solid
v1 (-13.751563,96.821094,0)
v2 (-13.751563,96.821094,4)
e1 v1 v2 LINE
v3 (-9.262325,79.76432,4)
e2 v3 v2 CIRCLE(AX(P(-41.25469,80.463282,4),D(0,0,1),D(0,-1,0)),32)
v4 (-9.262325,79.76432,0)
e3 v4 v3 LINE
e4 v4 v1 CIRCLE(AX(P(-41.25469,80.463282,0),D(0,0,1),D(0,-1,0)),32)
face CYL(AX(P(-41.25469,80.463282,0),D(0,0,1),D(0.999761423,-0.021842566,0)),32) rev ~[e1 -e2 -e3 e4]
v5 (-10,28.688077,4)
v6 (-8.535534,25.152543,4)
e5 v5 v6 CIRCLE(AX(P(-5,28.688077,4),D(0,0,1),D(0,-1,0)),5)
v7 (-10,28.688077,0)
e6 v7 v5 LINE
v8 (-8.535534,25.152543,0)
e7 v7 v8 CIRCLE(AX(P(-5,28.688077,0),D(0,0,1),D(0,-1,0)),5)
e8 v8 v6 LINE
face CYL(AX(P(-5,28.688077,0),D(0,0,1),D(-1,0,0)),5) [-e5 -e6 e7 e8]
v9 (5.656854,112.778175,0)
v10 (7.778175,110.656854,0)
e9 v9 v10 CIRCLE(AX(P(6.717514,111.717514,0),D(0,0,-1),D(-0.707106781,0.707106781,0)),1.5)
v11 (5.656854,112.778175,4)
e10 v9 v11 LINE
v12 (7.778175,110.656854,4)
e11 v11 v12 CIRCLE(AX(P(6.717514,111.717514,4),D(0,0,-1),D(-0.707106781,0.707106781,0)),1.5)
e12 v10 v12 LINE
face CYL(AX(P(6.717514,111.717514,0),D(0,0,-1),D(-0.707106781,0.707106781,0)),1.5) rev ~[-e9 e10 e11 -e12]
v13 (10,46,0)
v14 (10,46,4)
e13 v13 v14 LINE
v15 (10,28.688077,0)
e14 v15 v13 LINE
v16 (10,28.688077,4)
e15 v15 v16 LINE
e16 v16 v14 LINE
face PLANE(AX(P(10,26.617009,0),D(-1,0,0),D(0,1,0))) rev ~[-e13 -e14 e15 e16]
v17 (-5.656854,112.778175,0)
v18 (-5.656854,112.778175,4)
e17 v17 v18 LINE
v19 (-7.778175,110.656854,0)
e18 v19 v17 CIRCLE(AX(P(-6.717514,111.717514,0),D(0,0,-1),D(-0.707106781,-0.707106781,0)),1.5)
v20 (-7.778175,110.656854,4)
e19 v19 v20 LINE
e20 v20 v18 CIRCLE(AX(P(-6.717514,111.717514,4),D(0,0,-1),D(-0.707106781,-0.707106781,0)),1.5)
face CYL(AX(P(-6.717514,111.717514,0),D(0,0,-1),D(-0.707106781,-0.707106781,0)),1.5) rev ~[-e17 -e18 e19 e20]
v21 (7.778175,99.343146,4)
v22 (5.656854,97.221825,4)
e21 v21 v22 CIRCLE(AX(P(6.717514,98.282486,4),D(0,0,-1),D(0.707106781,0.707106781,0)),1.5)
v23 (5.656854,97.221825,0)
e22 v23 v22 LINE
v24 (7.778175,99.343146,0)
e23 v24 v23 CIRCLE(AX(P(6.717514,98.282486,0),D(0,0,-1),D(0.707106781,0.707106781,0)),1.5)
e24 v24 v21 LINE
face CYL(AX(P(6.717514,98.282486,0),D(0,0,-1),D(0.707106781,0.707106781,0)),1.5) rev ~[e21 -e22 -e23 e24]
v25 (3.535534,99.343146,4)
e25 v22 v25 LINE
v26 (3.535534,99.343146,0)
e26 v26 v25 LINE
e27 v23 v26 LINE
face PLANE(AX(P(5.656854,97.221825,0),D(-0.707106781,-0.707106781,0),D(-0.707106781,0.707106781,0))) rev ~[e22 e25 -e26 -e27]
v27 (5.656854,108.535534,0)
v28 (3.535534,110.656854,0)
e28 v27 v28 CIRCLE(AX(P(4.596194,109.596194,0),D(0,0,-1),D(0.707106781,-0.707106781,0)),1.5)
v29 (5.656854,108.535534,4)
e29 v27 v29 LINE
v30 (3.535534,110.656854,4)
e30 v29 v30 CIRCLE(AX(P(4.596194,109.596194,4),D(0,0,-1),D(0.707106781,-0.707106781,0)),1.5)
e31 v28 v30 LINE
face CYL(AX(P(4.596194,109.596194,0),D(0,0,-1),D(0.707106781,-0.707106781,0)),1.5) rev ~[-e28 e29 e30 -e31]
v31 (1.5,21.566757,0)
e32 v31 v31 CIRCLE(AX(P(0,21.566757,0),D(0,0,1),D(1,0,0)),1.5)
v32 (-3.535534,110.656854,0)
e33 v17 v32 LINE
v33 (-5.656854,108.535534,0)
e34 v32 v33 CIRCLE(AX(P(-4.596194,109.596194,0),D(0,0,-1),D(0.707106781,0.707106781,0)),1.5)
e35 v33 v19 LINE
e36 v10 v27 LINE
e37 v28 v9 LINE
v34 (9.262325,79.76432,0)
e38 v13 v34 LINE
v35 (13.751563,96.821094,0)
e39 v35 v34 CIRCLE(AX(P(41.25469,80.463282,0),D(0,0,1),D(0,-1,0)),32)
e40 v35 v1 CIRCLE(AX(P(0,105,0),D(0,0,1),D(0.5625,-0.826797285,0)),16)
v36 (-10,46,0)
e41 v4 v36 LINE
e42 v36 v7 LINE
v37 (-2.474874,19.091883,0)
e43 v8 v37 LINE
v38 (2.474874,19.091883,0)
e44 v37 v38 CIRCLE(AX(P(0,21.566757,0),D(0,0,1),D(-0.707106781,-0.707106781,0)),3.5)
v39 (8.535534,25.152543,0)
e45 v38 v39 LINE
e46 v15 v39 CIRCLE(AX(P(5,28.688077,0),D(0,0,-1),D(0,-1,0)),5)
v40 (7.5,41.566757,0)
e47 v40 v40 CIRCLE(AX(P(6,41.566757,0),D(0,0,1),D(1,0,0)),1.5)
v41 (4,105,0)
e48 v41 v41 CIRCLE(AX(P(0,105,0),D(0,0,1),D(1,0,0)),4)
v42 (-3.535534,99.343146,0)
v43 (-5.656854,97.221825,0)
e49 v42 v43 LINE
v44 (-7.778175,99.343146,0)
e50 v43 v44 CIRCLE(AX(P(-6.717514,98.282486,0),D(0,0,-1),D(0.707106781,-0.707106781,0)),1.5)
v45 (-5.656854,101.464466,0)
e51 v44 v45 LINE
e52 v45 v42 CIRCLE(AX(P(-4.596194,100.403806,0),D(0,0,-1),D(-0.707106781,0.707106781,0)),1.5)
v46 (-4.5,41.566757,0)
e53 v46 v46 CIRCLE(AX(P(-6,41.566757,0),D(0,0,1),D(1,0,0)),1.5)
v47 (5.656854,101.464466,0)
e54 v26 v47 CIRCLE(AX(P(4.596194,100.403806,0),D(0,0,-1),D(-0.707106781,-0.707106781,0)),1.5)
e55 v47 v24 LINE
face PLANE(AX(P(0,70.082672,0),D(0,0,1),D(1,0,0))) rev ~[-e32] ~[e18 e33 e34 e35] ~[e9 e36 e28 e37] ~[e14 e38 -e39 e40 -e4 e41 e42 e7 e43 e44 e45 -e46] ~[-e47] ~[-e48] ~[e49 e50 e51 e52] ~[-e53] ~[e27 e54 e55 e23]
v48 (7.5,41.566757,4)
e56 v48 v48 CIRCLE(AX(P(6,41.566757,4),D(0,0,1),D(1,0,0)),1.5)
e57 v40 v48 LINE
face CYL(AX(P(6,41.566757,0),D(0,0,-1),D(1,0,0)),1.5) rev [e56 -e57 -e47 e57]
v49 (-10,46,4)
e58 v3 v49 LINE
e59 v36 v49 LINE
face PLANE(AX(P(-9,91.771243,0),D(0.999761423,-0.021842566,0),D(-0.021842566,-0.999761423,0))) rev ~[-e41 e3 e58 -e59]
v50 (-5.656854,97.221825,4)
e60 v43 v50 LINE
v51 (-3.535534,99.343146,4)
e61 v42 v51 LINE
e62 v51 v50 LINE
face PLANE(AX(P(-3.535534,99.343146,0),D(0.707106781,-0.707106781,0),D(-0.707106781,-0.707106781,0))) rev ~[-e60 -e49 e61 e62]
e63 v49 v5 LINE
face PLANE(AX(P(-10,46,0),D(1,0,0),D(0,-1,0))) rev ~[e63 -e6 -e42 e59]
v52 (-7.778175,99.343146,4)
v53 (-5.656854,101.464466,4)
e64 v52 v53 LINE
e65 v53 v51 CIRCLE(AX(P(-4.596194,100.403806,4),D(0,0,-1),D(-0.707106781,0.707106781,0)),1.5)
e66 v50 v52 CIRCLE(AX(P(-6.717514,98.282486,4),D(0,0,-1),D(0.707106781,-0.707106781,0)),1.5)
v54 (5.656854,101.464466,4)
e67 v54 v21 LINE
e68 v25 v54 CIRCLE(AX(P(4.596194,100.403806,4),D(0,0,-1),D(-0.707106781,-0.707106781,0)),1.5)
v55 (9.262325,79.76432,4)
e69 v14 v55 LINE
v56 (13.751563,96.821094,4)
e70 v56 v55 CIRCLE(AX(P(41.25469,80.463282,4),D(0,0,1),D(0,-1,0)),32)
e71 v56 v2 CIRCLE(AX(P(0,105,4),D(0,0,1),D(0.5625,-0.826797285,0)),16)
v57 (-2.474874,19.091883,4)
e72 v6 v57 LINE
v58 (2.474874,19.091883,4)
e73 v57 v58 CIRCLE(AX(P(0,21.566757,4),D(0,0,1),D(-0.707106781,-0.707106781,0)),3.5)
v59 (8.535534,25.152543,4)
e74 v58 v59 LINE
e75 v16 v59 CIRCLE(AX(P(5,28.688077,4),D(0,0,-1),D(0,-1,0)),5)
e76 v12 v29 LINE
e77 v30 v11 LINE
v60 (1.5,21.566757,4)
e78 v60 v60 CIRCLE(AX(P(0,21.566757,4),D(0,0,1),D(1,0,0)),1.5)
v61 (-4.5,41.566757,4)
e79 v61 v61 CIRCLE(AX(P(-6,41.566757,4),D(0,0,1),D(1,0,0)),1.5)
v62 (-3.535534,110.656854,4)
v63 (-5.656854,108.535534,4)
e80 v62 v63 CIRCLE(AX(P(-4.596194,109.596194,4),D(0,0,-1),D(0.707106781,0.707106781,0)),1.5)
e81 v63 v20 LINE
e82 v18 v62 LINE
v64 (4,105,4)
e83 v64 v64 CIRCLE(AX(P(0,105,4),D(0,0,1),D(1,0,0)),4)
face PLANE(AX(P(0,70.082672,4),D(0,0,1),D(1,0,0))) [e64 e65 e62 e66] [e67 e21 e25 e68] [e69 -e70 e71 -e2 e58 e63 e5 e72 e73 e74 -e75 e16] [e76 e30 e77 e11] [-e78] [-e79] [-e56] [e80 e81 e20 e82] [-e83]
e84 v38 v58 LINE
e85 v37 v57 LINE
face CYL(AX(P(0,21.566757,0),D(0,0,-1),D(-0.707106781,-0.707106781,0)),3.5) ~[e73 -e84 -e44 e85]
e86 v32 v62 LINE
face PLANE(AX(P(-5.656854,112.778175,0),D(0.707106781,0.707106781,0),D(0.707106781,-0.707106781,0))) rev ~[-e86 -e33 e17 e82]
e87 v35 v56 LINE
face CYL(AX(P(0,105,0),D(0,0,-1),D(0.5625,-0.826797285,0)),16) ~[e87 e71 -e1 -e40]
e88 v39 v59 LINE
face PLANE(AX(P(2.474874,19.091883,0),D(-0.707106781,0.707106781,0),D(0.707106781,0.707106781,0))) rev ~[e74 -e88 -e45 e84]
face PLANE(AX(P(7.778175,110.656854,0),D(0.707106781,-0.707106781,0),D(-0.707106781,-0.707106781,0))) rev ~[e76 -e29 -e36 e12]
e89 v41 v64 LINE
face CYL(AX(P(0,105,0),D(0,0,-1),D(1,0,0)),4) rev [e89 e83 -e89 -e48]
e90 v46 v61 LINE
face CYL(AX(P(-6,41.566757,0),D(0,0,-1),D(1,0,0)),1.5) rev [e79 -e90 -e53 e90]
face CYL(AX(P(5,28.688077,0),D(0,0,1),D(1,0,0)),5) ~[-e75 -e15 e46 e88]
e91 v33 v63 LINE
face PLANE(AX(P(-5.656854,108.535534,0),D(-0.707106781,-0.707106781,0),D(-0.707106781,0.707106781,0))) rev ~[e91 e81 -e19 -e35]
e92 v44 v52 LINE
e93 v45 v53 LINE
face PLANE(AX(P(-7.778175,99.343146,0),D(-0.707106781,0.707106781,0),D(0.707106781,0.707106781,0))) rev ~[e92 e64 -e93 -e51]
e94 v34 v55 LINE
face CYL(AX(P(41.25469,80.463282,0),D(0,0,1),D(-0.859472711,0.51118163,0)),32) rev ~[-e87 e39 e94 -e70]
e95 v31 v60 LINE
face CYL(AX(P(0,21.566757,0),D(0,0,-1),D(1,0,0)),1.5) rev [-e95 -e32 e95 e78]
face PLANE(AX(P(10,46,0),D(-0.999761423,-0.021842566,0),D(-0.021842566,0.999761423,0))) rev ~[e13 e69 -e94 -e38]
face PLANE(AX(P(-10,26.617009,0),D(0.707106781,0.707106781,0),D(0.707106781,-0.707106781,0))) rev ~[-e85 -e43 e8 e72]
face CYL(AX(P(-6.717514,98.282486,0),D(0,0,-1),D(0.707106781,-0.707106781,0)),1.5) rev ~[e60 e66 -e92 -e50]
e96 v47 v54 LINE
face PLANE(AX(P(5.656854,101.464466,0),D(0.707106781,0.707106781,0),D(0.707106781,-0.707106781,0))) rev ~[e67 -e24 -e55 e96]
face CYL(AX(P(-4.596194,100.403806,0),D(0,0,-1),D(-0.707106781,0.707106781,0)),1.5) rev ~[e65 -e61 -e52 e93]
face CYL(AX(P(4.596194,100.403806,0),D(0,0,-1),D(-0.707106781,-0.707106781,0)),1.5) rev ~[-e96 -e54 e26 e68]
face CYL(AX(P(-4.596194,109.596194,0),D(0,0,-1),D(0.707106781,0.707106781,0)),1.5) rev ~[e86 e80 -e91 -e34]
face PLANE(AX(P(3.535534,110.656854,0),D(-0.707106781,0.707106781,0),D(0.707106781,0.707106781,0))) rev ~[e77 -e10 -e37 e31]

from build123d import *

# Parameters (mm, degrees)
F0_R     = 1.5
F0_R_2   = 4
F1_DEPTH = 4
F2_R     = 5
F3_R     = 32


# Not quite as in the source:
# - a feature names something its author has since deleted; it is built from what else it names


with BuildPart() as f1:
    # F0 (on Top) → F1 (new body)
    with BuildSketch(Plane.XY):
        with BuildLine():
            Line((-9, 91.7712434447), (-10, 46))
            Line((-10, 46), (-10, 26.6170093579))
            Line((-10, 26.6170093579), (-2.4748737342, 19.091883092))
            ThreePointArc((-2.4748737342, 19.091883092), (0, 18.0667568262), (2.4748737342, 19.091883092))
            Line((2.4748737342, 19.091883092), (10, 26.6170093579))
            Line((10, 26.6170093579), (10, 46))
            Line((10, 46), (9, 91.7712434447))
            ThreePointArc((9, 91.7712434447), (0, 121), (-9, 91.7712434447))
        make_face()
        with Locations((-6, 41.5667568262)):
            Circle(F0_R, mode=Mode.SUBTRACT)
        with Locations((0, 21.5667568262)):
            Circle(F0_R, mode=Mode.SUBTRACT)
        with Locations((6, 41.5667568262)):
            Circle(F0_R, mode=Mode.SUBTRACT)
        with BuildLine():
            ThreePointArc((-5.6568542495, 101.4644660941), (-3.5355339059, 101.4644660941), (-3.5355339059, 99.3431457505))
            Line((-3.5355339059, 99.3431457505), (-5.6568542495, 97.2218254069))
            ThreePointArc((-5.6568542495, 97.2218254069), (-7.7781745931, 97.2218254069), (-7.7781745931, 99.3431457505))
            Line((-7.7781745931, 99.3431457505), (-5.6568542495, 101.4644660941))
        make_face(mode=Mode.SUBTRACT)
        with BuildLine():
            ThreePointArc((-3.5355339059, 110.6568542495), (-3.5355339059, 108.5355339059), (-5.6568542495, 108.5355339059))
            Line((-5.6568542495, 108.5355339059), (-7.7781745931, 110.6568542495))
            ThreePointArc((-7.7781745931, 110.6568542495), (-7.7781745931, 112.7781745931), (-5.6568542495, 112.7781745931))
            Line((-5.6568542495, 112.7781745931), (-3.5355339059, 110.6568542495))
        make_face(mode=Mode.SUBTRACT)
        with Locations((0, 105)):
            Circle(F0_R_2, mode=Mode.SUBTRACT)
        with BuildLine():
            ThreePointArc((3.5355339059, 99.3431457505), (3.5355339059, 101.4644660941), (5.6568542495, 101.4644660941))
            Line((5.6568542495, 101.4644660941), (7.7781745931, 99.3431457505))
            ThreePointArc((7.7781745931, 99.3431457505), (7.7781745931, 97.2218254069), (5.6568542495, 97.2218254069))
            Line((5.6568542495, 97.2218254069), (3.5355339059, 99.3431457505))
        make_face(mode=Mode.SUBTRACT)
        with BuildLine():
            ThreePointArc((5.6568542495, 108.5355339059), (3.5355339059, 108.5355339059), (3.5355339059, 110.6568542495))
            Line((3.5355339059, 110.6568542495), (5.6568542495, 112.7781745931))
            ThreePointArc((5.6568542495, 112.7781745931), (7.7781745931, 112.7781745931), (7.7781745931, 110.6568542495))
            Line((7.7781745931, 110.6568542495), (5.6568542495, 108.5355339059))
        make_face(mode=Mode.SUBTRACT)
    extrude(amount=F1_DEPTH)

    # F2
    f2_edges = [f1.edges().sort_by_distance(p)[0] for p in [
        (10, 46, 2),
        (-10, 46, 2),
        (-10, 26.617009, 2),
        (10, 26.617009, 2),
    ]]
    fillet(f2_edges, radius=F2_R)

    # F3
    f3_edges = [f1.edges().sort_by_distance(p)[0] for p in [
        (-9, 91.771243, 2),
        (9, 91.771243, 2),
    ]]
    fillet(f3_edges, radius=F3_R)


solid = f1.part
